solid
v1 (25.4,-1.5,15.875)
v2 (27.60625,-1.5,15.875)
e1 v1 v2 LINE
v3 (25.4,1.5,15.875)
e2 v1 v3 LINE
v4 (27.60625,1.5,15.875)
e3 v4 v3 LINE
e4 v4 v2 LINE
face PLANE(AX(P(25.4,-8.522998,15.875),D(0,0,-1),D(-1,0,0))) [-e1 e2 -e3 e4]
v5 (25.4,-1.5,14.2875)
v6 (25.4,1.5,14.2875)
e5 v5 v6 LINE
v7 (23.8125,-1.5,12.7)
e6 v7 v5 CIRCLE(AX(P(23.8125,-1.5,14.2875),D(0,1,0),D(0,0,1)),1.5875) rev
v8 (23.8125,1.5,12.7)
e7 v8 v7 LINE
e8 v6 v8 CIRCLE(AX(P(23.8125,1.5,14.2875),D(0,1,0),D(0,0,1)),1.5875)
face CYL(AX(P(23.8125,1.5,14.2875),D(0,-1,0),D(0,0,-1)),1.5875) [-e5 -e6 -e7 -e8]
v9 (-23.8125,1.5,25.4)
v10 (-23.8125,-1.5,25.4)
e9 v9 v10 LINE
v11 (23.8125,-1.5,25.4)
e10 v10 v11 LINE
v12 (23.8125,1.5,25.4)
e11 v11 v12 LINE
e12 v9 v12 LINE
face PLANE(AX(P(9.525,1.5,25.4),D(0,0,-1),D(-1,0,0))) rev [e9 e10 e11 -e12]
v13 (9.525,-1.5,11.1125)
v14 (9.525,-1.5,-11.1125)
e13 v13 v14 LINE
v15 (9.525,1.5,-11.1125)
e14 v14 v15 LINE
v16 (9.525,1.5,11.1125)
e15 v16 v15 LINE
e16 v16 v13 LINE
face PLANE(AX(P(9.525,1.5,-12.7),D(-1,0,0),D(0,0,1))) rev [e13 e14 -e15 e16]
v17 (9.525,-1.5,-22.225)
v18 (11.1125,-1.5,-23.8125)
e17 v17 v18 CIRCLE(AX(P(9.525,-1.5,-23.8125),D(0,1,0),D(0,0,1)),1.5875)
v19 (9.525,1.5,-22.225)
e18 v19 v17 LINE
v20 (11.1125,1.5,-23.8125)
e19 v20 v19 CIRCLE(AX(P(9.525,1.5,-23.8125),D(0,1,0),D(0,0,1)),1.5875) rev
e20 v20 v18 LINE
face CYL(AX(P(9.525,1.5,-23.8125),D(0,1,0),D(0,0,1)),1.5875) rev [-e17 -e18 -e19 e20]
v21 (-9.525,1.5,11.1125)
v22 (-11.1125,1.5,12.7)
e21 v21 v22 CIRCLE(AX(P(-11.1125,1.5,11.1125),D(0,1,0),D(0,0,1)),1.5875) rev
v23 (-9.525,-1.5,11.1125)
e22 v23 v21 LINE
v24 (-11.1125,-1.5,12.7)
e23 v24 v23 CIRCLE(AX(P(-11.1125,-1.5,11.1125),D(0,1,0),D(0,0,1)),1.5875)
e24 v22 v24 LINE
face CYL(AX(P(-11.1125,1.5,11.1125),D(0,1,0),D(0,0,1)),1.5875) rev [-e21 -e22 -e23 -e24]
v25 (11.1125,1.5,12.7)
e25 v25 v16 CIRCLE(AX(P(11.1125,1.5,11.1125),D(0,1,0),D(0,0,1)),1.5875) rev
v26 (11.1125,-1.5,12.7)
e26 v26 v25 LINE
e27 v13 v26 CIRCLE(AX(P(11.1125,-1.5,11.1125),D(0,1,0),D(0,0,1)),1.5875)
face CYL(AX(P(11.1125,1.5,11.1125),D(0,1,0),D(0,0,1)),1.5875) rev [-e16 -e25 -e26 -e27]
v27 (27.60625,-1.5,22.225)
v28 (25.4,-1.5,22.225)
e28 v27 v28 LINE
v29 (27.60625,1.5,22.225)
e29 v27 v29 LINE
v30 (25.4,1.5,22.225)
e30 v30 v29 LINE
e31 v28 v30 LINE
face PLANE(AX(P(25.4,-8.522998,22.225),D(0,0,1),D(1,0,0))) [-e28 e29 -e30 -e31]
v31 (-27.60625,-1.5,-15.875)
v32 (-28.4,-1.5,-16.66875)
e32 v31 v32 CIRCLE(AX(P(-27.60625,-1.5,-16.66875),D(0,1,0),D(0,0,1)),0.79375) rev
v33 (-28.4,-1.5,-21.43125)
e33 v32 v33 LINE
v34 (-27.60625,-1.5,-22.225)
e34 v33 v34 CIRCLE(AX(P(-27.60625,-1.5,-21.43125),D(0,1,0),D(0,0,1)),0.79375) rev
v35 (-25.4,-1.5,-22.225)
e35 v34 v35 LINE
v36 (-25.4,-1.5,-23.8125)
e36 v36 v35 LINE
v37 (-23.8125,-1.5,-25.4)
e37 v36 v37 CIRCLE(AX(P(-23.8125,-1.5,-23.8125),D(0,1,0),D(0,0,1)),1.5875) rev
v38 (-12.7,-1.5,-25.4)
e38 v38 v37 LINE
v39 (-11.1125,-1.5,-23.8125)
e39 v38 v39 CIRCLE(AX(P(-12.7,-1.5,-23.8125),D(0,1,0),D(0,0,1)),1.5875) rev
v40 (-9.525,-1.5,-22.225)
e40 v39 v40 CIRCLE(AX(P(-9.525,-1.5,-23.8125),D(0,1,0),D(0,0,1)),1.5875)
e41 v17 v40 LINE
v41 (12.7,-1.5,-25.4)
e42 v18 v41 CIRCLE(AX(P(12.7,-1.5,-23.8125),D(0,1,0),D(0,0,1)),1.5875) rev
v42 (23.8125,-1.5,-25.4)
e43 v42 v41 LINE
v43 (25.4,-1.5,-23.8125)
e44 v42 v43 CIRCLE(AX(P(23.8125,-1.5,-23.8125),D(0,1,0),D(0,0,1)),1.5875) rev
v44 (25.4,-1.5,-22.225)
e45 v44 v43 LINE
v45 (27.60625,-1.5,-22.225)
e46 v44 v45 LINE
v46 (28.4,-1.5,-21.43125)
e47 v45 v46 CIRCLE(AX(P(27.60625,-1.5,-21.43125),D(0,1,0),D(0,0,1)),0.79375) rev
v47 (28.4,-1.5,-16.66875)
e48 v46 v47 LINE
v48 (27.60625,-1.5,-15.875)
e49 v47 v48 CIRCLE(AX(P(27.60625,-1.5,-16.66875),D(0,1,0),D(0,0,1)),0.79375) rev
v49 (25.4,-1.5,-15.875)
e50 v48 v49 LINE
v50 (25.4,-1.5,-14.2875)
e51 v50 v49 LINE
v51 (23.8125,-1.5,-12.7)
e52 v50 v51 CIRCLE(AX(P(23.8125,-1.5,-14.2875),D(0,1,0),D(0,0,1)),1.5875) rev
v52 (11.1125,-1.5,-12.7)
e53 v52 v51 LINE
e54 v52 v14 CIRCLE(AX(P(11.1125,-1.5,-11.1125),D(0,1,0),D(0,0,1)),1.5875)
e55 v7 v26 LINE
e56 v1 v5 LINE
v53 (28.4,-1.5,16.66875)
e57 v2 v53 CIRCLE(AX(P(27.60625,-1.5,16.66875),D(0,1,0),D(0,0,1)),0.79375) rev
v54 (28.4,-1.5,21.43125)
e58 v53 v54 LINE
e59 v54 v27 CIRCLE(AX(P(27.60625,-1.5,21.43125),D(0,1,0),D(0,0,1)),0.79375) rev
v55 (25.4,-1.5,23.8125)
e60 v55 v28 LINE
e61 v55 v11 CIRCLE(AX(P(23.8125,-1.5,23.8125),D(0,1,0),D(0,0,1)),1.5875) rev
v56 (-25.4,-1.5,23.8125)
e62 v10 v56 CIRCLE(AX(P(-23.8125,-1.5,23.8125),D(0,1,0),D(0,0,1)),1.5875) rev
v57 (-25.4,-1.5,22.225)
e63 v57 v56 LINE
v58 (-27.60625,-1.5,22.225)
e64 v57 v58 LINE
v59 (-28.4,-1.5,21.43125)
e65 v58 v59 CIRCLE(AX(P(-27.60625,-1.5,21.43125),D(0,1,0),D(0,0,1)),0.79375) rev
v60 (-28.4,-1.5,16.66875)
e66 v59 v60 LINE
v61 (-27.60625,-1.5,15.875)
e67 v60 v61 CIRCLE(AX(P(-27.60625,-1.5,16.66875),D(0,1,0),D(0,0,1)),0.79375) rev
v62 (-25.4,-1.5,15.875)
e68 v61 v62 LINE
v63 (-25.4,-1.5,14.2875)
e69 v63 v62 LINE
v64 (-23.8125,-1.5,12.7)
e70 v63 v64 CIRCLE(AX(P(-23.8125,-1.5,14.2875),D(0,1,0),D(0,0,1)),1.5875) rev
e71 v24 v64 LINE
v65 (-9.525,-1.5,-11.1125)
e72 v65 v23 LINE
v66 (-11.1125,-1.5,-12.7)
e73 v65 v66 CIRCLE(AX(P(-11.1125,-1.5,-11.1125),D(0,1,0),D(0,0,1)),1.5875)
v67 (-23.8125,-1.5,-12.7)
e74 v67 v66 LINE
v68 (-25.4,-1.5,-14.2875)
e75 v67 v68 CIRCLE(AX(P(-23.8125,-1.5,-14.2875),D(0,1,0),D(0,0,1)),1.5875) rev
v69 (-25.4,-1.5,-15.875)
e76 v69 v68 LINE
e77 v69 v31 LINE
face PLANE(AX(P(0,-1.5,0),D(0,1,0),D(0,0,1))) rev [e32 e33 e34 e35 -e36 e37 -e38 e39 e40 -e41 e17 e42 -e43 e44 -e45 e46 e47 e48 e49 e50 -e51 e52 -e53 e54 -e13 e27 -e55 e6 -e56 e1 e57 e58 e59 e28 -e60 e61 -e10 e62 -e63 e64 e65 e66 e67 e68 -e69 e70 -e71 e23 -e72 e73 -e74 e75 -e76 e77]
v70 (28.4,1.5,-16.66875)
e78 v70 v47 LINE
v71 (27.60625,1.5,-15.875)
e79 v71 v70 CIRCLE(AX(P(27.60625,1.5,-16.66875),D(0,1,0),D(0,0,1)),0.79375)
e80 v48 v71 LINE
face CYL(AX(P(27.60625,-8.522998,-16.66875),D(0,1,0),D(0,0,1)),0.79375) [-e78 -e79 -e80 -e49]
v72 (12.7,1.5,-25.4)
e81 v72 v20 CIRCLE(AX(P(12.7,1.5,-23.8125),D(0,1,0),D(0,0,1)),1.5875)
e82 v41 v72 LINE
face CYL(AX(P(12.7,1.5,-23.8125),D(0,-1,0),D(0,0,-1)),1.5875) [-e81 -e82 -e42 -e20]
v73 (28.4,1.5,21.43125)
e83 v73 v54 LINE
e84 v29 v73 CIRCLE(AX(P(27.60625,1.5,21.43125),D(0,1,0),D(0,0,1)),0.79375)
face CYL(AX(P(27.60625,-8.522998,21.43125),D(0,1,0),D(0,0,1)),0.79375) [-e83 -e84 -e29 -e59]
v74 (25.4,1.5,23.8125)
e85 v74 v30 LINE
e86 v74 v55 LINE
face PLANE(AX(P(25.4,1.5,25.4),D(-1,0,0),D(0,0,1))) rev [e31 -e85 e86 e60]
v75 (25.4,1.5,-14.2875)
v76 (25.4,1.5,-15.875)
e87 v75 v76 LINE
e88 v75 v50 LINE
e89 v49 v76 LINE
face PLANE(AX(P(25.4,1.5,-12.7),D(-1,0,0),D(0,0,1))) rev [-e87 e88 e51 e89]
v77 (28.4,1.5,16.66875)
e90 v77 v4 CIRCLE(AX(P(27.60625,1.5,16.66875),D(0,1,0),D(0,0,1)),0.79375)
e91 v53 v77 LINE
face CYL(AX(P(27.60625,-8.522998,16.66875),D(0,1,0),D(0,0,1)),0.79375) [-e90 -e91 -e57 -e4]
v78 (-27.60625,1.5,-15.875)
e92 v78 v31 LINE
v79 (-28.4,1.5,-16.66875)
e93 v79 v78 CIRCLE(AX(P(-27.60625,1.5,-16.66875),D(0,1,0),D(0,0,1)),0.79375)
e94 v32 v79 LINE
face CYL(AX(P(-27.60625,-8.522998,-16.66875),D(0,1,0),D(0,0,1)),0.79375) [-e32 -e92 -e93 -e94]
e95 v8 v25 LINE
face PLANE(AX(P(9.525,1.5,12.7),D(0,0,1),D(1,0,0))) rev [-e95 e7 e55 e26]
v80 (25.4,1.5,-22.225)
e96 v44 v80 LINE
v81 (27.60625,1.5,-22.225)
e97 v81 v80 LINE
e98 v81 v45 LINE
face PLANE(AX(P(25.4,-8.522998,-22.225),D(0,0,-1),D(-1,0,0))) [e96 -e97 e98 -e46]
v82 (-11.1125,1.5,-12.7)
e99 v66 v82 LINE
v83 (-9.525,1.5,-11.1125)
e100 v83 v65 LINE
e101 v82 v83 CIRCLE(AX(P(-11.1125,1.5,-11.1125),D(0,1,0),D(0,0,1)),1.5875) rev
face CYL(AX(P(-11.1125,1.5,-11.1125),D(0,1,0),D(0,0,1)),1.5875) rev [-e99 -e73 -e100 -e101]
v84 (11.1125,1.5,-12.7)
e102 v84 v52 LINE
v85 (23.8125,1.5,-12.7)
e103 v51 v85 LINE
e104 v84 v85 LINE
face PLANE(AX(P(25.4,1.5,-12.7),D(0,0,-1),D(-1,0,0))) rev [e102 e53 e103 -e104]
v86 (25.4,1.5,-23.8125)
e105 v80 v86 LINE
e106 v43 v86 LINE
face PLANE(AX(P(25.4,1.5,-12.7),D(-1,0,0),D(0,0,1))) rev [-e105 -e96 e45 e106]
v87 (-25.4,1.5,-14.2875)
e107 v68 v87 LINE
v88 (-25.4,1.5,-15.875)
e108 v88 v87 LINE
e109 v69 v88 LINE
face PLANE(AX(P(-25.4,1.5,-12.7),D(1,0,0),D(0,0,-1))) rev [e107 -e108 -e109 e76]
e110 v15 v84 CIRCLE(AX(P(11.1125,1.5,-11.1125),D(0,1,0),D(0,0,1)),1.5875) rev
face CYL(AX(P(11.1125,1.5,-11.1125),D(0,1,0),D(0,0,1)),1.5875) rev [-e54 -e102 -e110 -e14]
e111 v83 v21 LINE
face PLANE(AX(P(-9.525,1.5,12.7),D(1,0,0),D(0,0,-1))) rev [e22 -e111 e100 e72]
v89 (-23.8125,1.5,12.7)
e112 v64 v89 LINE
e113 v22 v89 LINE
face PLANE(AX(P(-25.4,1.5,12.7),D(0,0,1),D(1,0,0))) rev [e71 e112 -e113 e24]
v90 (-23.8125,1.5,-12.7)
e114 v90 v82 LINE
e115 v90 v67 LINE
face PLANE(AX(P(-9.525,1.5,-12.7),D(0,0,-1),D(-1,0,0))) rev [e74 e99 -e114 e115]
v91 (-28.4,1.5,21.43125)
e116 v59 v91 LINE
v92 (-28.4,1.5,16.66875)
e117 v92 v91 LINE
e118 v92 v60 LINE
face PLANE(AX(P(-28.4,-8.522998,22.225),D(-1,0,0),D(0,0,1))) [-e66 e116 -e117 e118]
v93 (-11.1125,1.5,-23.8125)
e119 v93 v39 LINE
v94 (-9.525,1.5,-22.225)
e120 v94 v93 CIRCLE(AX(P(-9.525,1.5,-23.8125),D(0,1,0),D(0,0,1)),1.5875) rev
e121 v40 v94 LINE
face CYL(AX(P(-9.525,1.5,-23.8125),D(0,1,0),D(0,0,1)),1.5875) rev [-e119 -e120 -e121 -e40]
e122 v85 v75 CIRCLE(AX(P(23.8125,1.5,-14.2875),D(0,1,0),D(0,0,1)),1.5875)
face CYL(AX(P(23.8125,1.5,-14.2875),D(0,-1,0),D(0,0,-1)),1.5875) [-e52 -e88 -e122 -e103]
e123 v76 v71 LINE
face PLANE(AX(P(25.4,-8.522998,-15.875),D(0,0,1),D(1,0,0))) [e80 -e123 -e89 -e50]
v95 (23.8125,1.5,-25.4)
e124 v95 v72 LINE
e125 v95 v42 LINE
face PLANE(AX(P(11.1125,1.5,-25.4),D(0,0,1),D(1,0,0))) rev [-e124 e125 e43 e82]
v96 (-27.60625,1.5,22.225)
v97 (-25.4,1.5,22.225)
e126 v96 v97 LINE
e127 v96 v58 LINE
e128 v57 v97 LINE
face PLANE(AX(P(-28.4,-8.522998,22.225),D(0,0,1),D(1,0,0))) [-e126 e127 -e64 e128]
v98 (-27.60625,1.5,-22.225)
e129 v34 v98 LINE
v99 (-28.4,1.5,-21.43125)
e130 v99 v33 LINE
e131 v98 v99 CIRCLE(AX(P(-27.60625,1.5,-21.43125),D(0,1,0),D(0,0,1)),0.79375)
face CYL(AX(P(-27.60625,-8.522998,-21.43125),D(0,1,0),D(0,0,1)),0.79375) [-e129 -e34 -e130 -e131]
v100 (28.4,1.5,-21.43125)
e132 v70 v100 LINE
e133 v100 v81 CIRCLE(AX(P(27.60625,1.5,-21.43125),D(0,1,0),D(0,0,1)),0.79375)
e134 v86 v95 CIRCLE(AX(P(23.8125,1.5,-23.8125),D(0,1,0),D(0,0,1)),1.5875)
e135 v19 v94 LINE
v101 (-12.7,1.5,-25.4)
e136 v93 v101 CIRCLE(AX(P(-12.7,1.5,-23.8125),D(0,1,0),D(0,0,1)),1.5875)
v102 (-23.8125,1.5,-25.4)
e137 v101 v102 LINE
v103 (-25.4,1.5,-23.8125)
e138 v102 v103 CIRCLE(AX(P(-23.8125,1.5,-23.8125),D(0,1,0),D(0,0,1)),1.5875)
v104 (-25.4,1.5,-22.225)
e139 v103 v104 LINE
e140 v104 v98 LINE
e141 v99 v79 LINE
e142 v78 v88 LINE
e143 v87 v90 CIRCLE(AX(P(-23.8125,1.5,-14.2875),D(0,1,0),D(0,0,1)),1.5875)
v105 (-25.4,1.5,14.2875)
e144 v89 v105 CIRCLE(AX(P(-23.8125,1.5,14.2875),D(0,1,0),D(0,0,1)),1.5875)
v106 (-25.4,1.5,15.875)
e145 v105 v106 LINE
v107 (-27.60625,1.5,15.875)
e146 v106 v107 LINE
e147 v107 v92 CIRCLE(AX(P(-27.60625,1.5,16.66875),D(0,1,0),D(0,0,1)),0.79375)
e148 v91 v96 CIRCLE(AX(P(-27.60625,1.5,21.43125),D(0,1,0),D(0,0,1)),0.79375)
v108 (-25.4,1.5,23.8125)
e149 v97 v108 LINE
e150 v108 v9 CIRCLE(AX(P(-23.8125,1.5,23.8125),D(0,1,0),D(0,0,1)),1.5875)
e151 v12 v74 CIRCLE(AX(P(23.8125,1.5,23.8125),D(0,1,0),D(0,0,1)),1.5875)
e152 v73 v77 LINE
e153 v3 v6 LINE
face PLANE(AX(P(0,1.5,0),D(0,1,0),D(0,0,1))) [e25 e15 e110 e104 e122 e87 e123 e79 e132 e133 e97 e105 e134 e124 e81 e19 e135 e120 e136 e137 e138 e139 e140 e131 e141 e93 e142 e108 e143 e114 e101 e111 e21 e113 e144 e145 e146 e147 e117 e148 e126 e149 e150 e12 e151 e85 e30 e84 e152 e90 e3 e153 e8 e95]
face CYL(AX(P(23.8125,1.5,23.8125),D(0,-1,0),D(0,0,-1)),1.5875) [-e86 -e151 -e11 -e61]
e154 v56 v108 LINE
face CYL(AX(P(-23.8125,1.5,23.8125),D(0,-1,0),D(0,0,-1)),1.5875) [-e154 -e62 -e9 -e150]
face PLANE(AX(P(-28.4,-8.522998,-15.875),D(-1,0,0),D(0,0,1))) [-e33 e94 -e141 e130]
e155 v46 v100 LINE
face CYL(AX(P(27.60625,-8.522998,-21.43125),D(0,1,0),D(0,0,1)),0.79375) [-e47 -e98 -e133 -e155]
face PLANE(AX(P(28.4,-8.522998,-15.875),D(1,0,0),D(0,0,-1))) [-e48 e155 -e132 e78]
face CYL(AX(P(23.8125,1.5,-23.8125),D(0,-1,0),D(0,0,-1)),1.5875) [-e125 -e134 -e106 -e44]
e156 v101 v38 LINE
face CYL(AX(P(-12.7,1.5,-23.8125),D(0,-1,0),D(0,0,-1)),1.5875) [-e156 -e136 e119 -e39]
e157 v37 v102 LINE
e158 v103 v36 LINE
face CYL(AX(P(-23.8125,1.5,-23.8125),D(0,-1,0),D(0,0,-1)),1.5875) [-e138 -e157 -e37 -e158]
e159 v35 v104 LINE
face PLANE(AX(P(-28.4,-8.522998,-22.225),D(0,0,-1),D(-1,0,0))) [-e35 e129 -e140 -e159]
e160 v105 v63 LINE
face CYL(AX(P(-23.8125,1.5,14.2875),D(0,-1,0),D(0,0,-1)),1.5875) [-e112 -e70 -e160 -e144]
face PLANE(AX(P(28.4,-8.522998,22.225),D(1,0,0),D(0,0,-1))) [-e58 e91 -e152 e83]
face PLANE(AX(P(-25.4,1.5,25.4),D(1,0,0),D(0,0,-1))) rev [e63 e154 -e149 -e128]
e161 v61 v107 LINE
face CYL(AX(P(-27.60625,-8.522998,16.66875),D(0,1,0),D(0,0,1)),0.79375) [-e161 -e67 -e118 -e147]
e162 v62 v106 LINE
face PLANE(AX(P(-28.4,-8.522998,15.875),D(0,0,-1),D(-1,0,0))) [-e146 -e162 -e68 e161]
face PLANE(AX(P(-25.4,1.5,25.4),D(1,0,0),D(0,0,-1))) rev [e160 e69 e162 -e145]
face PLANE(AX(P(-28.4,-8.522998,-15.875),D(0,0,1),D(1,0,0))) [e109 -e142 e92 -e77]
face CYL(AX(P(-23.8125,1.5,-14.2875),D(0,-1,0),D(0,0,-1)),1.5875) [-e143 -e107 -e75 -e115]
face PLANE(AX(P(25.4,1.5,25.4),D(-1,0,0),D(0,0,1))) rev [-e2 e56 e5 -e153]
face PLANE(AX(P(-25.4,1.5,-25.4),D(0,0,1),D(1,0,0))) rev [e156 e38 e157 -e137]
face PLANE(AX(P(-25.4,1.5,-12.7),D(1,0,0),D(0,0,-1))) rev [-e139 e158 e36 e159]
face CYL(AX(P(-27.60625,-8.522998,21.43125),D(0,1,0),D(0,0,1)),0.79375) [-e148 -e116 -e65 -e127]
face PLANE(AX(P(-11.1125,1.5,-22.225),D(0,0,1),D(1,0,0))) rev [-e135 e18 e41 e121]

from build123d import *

# Parameters (mm, degrees)
BOSS_EXTRUDE1_DEPTH = 1.5
FILLET1_R           = 1.5875
SKETCH2_W           = 3
SKETCH2_H           = 6.35
BOSS_EXTRUDE2_DEPTH = 3
FILLET2_R           = 0.79375


with BuildPart() as part:
    # Sketch1 → Boss-Extrude1 (new, symmetric)
    with BuildSketch(Plane(origin=(0, 0, 0), x_dir=(1, 0, 0), z_dir=(0, 1, 0))):
        Polygon((25.4, 12.7), (9.525, 12.7), (9.525, -12.7), (25.4, -12.7), (25.4, -25.4), (9.525, -25.4), (0, -25.4), (-9.525, -25.4), (-25.4, -25.4), (-25.4, -12.7), (-9.525, -12.7), (-9.525, 12.7), (-25.4, 12.7), (-25.4, 25.4), (-11.1125, 25.4), (-11.1125, 22.225), (11.1125, 22.225), (11.1125, 25.4), (25.4, 25.4), align=None)
    extrude(amount=BOSS_EXTRUDE1_DEPTH, both=True)

    # Fillet1
    fillet1_edges = [part.edges().sort_by_distance(p)[0] for p in [
        (25.4, 0, -12.7),
        (9.525, 0, -12.7),
        (9.525, 0, 12.7),
        (25.4, 0, 12.7),
        (25.4, 0, 25.4),
        (-25.4, 0, 12.7),
        (-9.525, 0, 12.7),
        (-9.525, 0, -12.7),
        (-25.4, 0, -12.7),
        (-25.4, 0, -25.4),
        (-25.4, 0, 25.4),
        (25.4, 0, -25.4),
        (-11.1125, 0, -25.4),
        (-11.1125, 0, -22.225),
        (11.1125, 0, -22.225),
        (11.1125, 0, -25.4),
    ]]
    fillet(fillet1_edges, radius=FILLET1_R - 0.0001)  # a hair under: the kernel refuses the full size

    # Sketch2 → Boss-Extrude2 (add)
    with BuildSketch(Plane(origin=(0, 1.5, 0), x_dir=(1, 0, 0), z_dir=(0, 1, 0))):
        with Locations((-26.9, 19.05)):
            Rectangle(SKETCH2_W, SKETCH2_H)
        with Locations((26.9, 19.05)):
            Rectangle(SKETCH2_W, SKETCH2_H)
        with Locations((26.9, -19.05)):
            Rectangle(SKETCH2_W, SKETCH2_H)
        with Locations((-26.9, -19.05)):
            Rectangle(SKETCH2_W, SKETCH2_H)
    extrude(amount=-BOSS_EXTRUDE2_DEPTH)

    # Fillet2
    fillet2_edges = [part.edges().sort_by_distance(p)[0] for p in [
        (-28.4, 0, 22.225),
        (-28.4, 0, 15.875),
        (28.4, 0, 15.875),
        (28.4, 0, 22.225),
        (28.4, 0, -22.225),
        (28.4, 0, -15.875),
        (-28.4, 0, -15.875),
        (-28.4, 0, -22.225),
    ]]
    fillet(fillet2_edges, radius=FILLET2_R)


solid = part.part
